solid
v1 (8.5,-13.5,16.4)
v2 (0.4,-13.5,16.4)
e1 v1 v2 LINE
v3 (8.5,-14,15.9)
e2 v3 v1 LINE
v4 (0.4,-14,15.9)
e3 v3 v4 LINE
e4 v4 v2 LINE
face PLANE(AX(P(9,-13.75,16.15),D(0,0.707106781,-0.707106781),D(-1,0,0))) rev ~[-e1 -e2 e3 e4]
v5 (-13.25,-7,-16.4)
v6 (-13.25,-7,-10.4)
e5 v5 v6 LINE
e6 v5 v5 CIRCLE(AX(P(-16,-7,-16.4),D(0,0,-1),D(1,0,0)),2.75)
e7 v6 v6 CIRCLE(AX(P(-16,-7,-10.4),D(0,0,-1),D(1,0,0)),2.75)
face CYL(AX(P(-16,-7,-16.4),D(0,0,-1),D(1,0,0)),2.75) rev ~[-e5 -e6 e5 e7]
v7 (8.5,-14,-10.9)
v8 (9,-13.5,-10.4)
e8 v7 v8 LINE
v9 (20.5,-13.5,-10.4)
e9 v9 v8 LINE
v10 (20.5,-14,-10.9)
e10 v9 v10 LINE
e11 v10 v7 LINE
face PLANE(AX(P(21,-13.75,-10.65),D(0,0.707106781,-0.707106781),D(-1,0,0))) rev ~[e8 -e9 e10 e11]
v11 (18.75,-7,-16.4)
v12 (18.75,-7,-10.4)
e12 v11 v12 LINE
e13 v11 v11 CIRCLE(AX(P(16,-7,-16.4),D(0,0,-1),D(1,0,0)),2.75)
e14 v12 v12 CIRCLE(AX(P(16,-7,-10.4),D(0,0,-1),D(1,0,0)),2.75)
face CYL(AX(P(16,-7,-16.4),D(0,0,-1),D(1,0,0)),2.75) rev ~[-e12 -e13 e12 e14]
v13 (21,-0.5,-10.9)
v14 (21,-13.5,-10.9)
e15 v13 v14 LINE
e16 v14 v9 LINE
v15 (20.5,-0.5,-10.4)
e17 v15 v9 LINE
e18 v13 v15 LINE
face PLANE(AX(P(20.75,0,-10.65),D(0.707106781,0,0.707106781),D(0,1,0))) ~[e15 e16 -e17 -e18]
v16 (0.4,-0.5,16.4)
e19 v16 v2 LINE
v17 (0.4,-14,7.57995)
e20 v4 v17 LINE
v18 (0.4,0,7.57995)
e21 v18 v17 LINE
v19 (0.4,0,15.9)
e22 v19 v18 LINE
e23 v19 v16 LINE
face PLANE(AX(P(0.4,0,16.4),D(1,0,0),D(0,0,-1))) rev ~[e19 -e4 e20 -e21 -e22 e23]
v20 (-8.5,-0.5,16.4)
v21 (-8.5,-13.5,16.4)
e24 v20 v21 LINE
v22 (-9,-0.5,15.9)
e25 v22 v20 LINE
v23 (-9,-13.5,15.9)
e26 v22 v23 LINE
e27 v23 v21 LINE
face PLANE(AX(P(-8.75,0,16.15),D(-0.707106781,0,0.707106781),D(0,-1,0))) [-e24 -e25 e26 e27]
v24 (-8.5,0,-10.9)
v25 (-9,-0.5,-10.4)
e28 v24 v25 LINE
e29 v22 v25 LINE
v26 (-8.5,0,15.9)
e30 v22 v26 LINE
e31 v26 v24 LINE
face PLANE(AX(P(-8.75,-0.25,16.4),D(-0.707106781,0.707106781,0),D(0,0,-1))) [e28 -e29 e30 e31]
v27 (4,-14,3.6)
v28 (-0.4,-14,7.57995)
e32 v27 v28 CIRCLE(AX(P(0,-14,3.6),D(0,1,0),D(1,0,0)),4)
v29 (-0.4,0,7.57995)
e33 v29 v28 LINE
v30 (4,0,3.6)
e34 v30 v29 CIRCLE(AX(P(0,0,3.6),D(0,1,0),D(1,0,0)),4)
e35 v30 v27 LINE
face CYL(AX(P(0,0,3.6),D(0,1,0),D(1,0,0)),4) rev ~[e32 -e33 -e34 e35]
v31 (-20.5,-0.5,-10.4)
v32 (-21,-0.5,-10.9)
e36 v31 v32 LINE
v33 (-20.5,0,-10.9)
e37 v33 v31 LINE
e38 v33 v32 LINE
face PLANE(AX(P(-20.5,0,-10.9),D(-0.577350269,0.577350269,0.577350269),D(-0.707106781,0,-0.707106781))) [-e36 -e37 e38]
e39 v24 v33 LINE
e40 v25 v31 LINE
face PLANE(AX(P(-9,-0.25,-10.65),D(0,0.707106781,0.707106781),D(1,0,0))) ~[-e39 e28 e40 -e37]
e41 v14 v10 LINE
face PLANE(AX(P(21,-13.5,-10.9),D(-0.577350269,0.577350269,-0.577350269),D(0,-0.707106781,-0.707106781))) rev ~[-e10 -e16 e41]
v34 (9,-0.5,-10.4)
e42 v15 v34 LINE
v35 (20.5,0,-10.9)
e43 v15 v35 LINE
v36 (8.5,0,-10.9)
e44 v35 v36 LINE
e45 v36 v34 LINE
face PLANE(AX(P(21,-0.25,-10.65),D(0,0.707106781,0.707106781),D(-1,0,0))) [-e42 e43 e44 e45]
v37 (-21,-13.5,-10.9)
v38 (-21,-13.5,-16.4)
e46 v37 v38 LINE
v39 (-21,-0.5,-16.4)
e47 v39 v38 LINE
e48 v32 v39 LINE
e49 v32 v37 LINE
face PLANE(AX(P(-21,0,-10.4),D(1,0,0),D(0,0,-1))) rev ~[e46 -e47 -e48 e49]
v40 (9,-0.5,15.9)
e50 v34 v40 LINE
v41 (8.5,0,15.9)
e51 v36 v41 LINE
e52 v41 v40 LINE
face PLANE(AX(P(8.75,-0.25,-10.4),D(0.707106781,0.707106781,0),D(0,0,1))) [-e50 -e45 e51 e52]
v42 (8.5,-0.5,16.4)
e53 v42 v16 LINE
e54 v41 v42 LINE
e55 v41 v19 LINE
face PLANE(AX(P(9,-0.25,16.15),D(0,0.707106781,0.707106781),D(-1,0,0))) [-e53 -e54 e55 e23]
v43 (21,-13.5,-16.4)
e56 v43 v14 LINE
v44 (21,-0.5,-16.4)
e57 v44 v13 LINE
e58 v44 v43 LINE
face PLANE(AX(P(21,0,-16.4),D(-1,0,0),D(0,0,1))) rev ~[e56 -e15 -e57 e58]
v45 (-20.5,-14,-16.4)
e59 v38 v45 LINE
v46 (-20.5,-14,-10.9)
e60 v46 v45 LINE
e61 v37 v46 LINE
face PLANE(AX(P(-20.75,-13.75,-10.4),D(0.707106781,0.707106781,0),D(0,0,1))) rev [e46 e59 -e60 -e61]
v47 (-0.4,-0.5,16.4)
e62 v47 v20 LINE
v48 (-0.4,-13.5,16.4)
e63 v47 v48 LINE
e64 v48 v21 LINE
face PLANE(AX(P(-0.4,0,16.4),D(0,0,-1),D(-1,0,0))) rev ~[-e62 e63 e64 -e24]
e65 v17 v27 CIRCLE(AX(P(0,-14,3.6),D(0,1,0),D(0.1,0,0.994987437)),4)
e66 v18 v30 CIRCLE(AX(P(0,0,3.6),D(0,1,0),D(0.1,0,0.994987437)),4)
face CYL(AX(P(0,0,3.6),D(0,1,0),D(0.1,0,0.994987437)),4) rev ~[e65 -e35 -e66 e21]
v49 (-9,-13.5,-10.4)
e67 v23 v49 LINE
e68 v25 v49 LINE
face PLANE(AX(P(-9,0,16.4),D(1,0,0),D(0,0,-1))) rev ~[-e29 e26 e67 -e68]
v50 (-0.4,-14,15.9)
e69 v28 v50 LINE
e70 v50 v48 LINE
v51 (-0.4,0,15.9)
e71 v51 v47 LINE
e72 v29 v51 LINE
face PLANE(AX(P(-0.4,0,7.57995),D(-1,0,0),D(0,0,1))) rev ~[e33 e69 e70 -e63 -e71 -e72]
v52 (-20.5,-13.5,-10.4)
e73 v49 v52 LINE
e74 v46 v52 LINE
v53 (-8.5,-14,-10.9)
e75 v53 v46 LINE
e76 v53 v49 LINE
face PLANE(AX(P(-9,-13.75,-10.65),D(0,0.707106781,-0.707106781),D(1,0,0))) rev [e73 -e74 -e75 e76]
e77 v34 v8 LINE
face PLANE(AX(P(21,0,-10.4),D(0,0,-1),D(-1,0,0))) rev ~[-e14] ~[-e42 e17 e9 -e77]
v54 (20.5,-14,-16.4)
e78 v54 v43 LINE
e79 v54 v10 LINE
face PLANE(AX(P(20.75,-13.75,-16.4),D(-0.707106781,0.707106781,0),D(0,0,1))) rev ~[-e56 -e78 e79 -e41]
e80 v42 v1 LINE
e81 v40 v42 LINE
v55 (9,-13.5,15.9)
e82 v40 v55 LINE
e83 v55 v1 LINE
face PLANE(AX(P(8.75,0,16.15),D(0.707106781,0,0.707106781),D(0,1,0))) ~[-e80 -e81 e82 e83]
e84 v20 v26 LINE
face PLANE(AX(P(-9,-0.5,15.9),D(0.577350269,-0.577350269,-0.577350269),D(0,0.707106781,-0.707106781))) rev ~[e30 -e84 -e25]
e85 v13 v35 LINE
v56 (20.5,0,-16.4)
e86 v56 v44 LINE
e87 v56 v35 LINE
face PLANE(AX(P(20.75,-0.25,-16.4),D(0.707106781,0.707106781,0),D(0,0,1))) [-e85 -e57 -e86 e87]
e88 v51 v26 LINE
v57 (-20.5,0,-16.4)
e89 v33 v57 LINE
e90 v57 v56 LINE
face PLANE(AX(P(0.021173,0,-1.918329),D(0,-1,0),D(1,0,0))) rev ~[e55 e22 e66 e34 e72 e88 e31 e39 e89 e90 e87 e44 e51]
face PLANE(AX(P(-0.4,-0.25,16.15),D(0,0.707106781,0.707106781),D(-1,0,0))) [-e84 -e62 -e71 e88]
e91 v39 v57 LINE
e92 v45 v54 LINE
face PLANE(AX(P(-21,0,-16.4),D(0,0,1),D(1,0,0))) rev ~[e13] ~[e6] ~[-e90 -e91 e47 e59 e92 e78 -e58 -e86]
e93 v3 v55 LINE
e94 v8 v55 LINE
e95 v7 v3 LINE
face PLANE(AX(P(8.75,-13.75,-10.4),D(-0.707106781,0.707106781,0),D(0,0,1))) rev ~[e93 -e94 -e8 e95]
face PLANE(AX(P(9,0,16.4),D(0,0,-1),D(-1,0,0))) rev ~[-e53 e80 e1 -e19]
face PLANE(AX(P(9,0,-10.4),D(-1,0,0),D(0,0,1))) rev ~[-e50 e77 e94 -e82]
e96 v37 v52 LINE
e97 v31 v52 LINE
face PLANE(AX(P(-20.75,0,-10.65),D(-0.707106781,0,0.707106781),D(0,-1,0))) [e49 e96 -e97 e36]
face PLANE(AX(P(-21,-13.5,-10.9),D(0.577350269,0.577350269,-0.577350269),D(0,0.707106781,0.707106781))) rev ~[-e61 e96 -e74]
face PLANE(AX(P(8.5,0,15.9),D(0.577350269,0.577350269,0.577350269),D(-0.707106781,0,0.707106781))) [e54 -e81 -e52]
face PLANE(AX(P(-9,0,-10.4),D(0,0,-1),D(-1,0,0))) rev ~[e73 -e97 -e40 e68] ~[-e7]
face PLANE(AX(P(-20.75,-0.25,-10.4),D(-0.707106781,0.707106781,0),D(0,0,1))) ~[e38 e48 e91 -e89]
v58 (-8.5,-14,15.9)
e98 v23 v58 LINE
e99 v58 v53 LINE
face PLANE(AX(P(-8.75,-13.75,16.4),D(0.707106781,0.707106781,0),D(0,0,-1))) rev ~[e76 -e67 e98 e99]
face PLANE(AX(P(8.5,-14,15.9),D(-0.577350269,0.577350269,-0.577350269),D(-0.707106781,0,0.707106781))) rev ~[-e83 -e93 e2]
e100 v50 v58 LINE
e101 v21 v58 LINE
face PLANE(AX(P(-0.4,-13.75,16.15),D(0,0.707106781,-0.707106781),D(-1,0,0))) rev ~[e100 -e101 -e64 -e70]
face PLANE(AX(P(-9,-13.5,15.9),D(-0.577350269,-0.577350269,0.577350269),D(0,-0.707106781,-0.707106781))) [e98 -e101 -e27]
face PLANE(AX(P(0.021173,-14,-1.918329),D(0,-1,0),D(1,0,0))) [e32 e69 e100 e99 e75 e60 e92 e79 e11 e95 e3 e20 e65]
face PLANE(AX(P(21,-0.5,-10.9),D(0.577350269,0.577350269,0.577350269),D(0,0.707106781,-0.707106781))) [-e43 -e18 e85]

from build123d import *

# Parameters (mm, degrees)
F1_DEPTH = 14
F2_R     = 2.75
F3_DEPTH = 6
F4_SIZE  = 0.5


with BuildPart() as f1:
    # F0 (on Front) → F1 (new body)
    with BuildSketch(Plane.XZ):
        with BuildLine():
            Line((-21, -10.4), (-21, -16.4))
            Line((-21, -16.4), (21, -16.4))
            Line((21, -16.4), (21, -10.4))
            Line((21, -10.4), (9, -10.4))
            Line((9, -10.4), (9, 16.4))
            Line((9, 16.4), (0.4, 16.4))
            Line((0.4, 16.4), (0.4, 7.5799497484))
            ThreePointArc((0.4, 7.5799497484), (2.9664793948, 6.283281573), (4, 3.6))
            ThreePointArc((4, 3.6), (-2.683281573, 0.6335206052), (-0.4, 7.5799497484))
            Line((-0.4, 7.5799497484), (-0.4, 16.4))
            Line((-0.4, 16.4), (-9, 16.4))
            Line((-9, 16.4), (-9, -10.4))
            Line((-9, -10.4), (-21, -10.4))
        make_face()
    extrude(amount=F1_DEPTH)

    # F2 (on face) → F3 (cut)
    with BuildSketch(Plane(origin=(0, 0, -16.4), x_dir=(1, 0, 0), z_dir=(0, 0, -1))):
        with Locations((-16, 7)):
            Circle(F2_R)
        with Locations((16, 7)):
            Circle(F2_R)
    extrude(amount=-F3_DEPTH, mode=Mode.SUBTRACT)

    # F4
    f4_edges = [f1.edges().sort_by_distance(p)[0] for p in [
        (9, -7, 16.4),
        (-4.7, -14, 16.4),
        (-4.7, 0, 16.4),
        (-9, -7, 16.4),
        (9, -14, 3),
        (9, 0, 3),
        (15, 0, -10.4),
        (15, -14, -10.4),
        (21, -7, -10.4),
        (21, -14, -13.4),
        (21, 0, -13.4),
        (-9, -14, 3),
        (-15, -14, -10.4),
        (-21, -14, -13.4),
        (-21, -7, -10.4),
        (-9, 0, 3),
        (-15, 0, -10.4),
        (-21, 0, -13.4),
        (4.7, 0, 16.4),
        (4.7, -14, 16.4),
    ]]
    chamfer(f4_edges, length=F4_SIZE)


solid = f1.part
